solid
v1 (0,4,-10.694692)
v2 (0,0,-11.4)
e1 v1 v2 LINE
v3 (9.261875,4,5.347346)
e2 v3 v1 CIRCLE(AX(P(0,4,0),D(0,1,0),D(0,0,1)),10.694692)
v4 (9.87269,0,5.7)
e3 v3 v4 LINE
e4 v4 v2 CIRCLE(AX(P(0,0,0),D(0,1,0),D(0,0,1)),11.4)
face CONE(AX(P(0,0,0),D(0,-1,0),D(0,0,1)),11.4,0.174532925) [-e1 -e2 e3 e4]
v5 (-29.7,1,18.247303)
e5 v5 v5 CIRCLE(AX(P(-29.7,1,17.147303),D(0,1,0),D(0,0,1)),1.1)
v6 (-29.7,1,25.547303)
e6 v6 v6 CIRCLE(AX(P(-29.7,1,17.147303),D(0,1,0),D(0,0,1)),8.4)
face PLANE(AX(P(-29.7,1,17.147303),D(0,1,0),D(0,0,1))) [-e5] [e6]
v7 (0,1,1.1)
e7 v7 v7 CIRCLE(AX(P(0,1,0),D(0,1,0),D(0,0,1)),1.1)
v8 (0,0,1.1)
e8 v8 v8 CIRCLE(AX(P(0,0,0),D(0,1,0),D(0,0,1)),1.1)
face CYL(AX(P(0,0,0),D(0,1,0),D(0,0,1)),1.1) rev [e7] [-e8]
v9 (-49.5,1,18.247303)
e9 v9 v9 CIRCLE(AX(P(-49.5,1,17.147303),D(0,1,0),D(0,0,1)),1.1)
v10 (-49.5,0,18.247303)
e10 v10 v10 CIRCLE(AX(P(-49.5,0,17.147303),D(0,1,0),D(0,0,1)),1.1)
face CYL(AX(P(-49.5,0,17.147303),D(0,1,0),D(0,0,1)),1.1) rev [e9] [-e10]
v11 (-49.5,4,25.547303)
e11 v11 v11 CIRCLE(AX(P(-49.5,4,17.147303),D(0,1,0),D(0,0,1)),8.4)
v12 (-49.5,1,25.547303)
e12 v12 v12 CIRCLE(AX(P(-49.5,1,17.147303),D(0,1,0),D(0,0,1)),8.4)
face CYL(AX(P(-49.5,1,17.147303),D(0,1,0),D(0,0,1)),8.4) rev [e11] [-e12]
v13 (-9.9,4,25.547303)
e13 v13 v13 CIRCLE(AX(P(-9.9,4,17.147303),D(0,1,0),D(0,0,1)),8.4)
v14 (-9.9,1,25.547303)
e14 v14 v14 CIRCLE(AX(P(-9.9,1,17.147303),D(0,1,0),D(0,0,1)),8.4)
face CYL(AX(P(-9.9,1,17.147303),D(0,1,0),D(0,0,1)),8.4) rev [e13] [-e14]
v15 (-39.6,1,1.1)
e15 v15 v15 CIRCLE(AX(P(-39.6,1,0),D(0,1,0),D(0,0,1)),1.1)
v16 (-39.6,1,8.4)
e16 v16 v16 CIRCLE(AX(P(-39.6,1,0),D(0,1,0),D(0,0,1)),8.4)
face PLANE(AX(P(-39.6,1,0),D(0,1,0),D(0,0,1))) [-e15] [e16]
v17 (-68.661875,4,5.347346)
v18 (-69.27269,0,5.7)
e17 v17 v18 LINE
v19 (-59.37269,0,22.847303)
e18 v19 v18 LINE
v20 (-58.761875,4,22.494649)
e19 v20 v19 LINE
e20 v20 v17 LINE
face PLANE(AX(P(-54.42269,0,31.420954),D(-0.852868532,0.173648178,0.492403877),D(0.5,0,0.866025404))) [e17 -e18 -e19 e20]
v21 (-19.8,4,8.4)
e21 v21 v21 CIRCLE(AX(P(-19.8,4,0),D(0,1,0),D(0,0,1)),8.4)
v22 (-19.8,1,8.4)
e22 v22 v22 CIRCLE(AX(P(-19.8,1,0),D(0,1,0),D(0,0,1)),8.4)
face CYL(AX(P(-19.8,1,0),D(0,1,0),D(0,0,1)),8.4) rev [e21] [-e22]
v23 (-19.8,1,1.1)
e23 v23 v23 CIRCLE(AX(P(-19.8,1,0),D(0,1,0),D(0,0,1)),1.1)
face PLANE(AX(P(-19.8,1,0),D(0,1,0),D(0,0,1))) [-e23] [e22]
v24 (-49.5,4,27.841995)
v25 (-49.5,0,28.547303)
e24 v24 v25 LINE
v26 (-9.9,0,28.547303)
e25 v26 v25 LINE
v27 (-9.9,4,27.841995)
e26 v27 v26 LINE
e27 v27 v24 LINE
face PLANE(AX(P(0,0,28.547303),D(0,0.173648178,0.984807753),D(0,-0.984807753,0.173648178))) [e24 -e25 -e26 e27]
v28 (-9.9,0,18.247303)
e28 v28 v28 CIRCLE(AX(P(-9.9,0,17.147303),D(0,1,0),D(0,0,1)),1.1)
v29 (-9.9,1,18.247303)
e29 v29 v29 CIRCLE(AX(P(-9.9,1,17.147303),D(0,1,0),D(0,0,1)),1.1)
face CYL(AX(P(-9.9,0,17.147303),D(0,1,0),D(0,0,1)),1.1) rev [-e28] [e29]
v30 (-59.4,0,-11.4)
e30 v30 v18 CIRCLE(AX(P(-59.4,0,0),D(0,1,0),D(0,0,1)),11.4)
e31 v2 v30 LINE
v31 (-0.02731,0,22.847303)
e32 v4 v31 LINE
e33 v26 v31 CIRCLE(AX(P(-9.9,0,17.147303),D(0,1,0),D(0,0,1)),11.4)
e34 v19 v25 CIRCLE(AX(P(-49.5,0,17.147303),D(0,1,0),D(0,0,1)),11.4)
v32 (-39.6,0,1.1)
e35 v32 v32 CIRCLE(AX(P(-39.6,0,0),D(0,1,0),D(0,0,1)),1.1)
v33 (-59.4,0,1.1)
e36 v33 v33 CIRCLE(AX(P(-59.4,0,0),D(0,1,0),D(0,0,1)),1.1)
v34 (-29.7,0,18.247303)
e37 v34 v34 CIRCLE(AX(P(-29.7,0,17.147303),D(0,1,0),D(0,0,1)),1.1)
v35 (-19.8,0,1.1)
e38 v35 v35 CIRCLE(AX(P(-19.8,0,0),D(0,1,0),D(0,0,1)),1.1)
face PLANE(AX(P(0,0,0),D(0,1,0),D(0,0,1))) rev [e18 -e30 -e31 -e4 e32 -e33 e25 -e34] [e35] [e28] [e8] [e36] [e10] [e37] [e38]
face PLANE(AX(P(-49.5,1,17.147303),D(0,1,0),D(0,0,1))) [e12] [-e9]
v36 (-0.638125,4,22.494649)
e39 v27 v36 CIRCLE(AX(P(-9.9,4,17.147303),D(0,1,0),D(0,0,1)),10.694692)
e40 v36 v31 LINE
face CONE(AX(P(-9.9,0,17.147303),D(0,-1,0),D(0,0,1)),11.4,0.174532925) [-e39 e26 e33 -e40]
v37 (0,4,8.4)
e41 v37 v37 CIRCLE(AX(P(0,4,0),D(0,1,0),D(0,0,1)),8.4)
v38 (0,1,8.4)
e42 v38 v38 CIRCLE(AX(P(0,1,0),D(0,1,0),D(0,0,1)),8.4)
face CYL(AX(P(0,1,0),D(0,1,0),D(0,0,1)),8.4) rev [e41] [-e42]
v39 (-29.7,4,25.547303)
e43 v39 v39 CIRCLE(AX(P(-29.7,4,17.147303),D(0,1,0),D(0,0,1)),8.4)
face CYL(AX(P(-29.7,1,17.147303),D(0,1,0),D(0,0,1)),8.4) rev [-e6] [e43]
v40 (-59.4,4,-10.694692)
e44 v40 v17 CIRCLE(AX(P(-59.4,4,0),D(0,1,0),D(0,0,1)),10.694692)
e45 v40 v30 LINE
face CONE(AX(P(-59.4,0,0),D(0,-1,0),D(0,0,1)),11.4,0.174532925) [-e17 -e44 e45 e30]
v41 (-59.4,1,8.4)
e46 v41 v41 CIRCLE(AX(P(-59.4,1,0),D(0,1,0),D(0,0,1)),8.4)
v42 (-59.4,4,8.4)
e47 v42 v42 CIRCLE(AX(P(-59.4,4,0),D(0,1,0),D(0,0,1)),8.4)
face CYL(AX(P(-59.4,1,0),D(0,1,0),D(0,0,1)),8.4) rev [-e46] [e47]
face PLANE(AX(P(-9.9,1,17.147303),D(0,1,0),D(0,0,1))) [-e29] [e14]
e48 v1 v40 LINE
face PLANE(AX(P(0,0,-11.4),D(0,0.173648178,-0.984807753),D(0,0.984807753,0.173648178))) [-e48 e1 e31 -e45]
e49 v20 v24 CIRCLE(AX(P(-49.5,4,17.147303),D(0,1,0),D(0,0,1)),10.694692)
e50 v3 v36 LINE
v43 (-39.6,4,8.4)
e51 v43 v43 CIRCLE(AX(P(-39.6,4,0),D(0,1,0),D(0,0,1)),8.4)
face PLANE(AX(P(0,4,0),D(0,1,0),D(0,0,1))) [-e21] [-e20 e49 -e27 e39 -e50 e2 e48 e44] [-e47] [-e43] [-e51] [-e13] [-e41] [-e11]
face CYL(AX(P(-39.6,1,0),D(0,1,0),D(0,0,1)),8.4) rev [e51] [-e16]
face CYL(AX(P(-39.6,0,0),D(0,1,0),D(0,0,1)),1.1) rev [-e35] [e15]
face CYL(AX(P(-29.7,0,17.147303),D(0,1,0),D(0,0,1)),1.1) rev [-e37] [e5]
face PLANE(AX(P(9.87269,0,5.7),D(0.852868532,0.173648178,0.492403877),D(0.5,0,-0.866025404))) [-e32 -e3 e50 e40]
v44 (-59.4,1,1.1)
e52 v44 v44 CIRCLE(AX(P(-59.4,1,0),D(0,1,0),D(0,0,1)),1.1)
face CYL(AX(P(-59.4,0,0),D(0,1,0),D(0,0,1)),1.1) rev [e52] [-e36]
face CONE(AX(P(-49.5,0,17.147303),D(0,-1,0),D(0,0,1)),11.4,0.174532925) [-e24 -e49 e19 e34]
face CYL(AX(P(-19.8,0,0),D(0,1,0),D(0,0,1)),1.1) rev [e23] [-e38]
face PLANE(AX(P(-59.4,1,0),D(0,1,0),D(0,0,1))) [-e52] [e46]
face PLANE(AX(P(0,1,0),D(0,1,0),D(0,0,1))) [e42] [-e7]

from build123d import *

# Parameters (mm, degrees)
BOSS_EXTRUDE1_DEPTH = 4
BOSS_EXTRUDE1_DRAFT = 10
CUT_EXTRUDE1_START  = 4
SKETCH1_3_R         = 1.1
CUT_EXTRUDE1_DEPTH  = 4
CUT_EXTRUDE2_START  = 4
SKETCH1_4_R         = 8.4
SKETCH1_4_R_2       = 1.1
CUT_EXTRUDE2_DEPTH  = 3


# Read off the part's stored shape, not the designer's step: Boss-Extrude1
with BuildPart() as part:
    # Boss-Extrude1 outline → Boss-Extrude1 (with draft: the straight prism first)
    with BuildSketch(Plane(origin=(0, 4, 0), x_dir=(1, 0, 0), z_dir=(0, 1, 0))):
        with BuildLine():
            ThreePointArc((-58.761875024, -22.494649034), (-54.847346039, -26.409178019), (-49.5, -27.841995072))
            Line((-49.5, -27.841995072), (-9.9, -27.841995072))
            ThreePointArc((-9.9, -27.841995072), (-4.552653961, -26.409178019), (-0.638124976, -22.494649034))
            Line((-0.638124976, -22.494649034), (9.261875024, -5.347346039))
            ThreePointArc((9.261875024, -5.347346039), (9.261875024, 5.347346039), (0, 10.694692077))
            Line((0, 10.694692077), (-59.4, 10.694692077))
            ThreePointArc((-59.4, 10.694692077), (-68.661875024, 5.347346039), (-68.661875024, -5.347346039))
            Line((-68.661875024, -5.347346039), (-58.761875024, -22.494649034))
        make_face()
    extrude(amount=-BOSS_EXTRUDE1_DEPTH)
    # Boss-Extrude1: the draft: its side faces are tilted about the plane it starts from
    boss_extrude1_sides = [part.faces().sort_by_distance(p)[0] for p in [
        (-68.661875024, 2, -5.347346038),
        (-63.711875024, 2, 13.920997536),
        (-54.847346038, 2, 26.409178019),
        (-29.7, 2, 27.841995072),
        (-4.552653962, 2, 26.409178019),
        (4.311875024, 2, 13.920997536),
        (9.261875024, 2, -5.347346038),
        (-29.7, 2, -10.694692077),
    ]]
    draft(boss_extrude1_sides, Plane(origin=(0, 4, 0), x_dir=(1, 0, 0), z_dir=(0, 1, 0)), BOSS_EXTRUDE1_DRAFT)

    # Sketch1<3> → Cut-Extrude1 (cut)
    with BuildSketch(Plane(origin=(0, 0, 0), x_dir=(1, 0, 0), z_dir=(0, 1, 0)).offset(CUT_EXTRUDE1_START)):
        with Locations(Location((-9.9, -17.147302995, 0), (0, 0, 270))):
            Circle(SKETCH1_3_R)
        with Locations(Location((0, 0, 0), (0, 0, 270))):
            Circle(SKETCH1_3_R)
        with Locations(Location((-29.7, -17.147302995, 0), (0, 0, 270))):
            Circle(SKETCH1_3_R)
        with Locations(Location((-39.6, 0, 0), (0, 0, 270))):
            Circle(SKETCH1_3_R)
        with Locations(Location((-49.5, -17.147302995, 0), (0, 0, 270))):
            Circle(SKETCH1_3_R)
        with Locations(Location((-59.4, 0, 0), (0, 0, 270))):
            Circle(SKETCH1_3_R)
        with Locations(Location((-19.8, 0, 0), (0, 0, 270))):
            Circle(SKETCH1_3_R)
    extrude(amount=-CUT_EXTRUDE1_DEPTH, mode=Mode.SUBTRACT)

    # Sketch1<4> → Cut-Extrude2 (cut)
    # profile 1 of 7: a face of its own
    with BuildSketch(Plane(origin=(0, 0, 0), x_dir=(1, 0, 0), z_dir=(0, 1, 0)).offset(CUT_EXTRUDE2_START)):
        with Locations(Location((-19.8, 0, 0), (0, 0, 270))):
            Circle(SKETCH1_4_R)
        with Locations(Location((-19.8, 0, 0), (0, 0, 270))):
            Circle(SKETCH1_4_R_2, mode=Mode.SUBTRACT)
    # profile 2 of 7: a face of its own
    with BuildSketch(Plane(origin=(0, 0, 0), x_dir=(1, 0, 0), z_dir=(0, 1, 0)).offset(CUT_EXTRUDE2_START)):
        with Locations(Location((-9.9, -17.147302995, 0), (0, 0, 270))):
            Circle(SKETCH1_4_R)
        with Locations(Location((-9.9, -17.147302995, 0), (0, 0, 270))):
            Circle(SKETCH1_4_R_2, mode=Mode.SUBTRACT)
    # profile 3 of 7: a face of its own
    with BuildSketch(Plane(origin=(0, 0, 0), x_dir=(1, 0, 0), z_dir=(0, 1, 0)).offset(CUT_EXTRUDE2_START)):
        with Locations(Location((0, 0, 0), (0, 0, 270))):
            Circle(SKETCH1_4_R)
        with Locations(Location((0, 0, 0), (0, 0, 270))):
            Circle(SKETCH1_4_R_2, mode=Mode.SUBTRACT)
    # profile 4 of 7: a face of its own
    with BuildSketch(Plane(origin=(0, 0, 0), x_dir=(1, 0, 0), z_dir=(0, 1, 0)).offset(CUT_EXTRUDE2_START)):
        with Locations(Location((-29.7, -17.147302995, 0), (0, 0, 270))):
            Circle(SKETCH1_4_R)
        with Locations(Location((-29.7, -17.147302995, 0), (0, 0, 270))):
            Circle(SKETCH1_4_R_2, mode=Mode.SUBTRACT)
    # profile 5 of 7: a face of its own
    with BuildSketch(Plane(origin=(0, 0, 0), x_dir=(1, 0, 0), z_dir=(0, 1, 0)).offset(CUT_EXTRUDE2_START)):
        with Locations(Location((-39.6, 0, 0), (0, 0, 270))):
            Circle(SKETCH1_4_R)
        with Locations(Location((-39.6, 0, 0), (0, 0, 270))):
            Circle(SKETCH1_4_R_2, mode=Mode.SUBTRACT)
    # profile 6 of 7: a face of its own
    with BuildSketch(Plane(origin=(0, 0, 0), x_dir=(1, 0, 0), z_dir=(0, 1, 0)).offset(CUT_EXTRUDE2_START)):
        with Locations(Location((-49.5, -17.147302995, 0), (0, 0, 270))):
            Circle(SKETCH1_4_R)
        with Locations(Location((-49.5, -17.147302995, 0), (0, 0, 270))):
            Circle(SKETCH1_4_R_2, mode=Mode.SUBTRACT)
    # profile 7 of 7: a face of its own
    with BuildSketch(Plane(origin=(0, 0, 0), x_dir=(1, 0, 0), z_dir=(0, 1, 0)).offset(CUT_EXTRUDE2_START)):
        with Locations(Location((-59.4, 0, 0), (0, 0, 270))):
            Circle(SKETCH1_4_R)
        with Locations(Location((-59.4, 0, 0), (0, 0, 270))):
            Circle(SKETCH1_4_R_2, mode=Mode.SUBTRACT)
    extrude(amount=-CUT_EXTRUDE2_DEPTH, mode=Mode.SUBTRACT)


solid = part.part
